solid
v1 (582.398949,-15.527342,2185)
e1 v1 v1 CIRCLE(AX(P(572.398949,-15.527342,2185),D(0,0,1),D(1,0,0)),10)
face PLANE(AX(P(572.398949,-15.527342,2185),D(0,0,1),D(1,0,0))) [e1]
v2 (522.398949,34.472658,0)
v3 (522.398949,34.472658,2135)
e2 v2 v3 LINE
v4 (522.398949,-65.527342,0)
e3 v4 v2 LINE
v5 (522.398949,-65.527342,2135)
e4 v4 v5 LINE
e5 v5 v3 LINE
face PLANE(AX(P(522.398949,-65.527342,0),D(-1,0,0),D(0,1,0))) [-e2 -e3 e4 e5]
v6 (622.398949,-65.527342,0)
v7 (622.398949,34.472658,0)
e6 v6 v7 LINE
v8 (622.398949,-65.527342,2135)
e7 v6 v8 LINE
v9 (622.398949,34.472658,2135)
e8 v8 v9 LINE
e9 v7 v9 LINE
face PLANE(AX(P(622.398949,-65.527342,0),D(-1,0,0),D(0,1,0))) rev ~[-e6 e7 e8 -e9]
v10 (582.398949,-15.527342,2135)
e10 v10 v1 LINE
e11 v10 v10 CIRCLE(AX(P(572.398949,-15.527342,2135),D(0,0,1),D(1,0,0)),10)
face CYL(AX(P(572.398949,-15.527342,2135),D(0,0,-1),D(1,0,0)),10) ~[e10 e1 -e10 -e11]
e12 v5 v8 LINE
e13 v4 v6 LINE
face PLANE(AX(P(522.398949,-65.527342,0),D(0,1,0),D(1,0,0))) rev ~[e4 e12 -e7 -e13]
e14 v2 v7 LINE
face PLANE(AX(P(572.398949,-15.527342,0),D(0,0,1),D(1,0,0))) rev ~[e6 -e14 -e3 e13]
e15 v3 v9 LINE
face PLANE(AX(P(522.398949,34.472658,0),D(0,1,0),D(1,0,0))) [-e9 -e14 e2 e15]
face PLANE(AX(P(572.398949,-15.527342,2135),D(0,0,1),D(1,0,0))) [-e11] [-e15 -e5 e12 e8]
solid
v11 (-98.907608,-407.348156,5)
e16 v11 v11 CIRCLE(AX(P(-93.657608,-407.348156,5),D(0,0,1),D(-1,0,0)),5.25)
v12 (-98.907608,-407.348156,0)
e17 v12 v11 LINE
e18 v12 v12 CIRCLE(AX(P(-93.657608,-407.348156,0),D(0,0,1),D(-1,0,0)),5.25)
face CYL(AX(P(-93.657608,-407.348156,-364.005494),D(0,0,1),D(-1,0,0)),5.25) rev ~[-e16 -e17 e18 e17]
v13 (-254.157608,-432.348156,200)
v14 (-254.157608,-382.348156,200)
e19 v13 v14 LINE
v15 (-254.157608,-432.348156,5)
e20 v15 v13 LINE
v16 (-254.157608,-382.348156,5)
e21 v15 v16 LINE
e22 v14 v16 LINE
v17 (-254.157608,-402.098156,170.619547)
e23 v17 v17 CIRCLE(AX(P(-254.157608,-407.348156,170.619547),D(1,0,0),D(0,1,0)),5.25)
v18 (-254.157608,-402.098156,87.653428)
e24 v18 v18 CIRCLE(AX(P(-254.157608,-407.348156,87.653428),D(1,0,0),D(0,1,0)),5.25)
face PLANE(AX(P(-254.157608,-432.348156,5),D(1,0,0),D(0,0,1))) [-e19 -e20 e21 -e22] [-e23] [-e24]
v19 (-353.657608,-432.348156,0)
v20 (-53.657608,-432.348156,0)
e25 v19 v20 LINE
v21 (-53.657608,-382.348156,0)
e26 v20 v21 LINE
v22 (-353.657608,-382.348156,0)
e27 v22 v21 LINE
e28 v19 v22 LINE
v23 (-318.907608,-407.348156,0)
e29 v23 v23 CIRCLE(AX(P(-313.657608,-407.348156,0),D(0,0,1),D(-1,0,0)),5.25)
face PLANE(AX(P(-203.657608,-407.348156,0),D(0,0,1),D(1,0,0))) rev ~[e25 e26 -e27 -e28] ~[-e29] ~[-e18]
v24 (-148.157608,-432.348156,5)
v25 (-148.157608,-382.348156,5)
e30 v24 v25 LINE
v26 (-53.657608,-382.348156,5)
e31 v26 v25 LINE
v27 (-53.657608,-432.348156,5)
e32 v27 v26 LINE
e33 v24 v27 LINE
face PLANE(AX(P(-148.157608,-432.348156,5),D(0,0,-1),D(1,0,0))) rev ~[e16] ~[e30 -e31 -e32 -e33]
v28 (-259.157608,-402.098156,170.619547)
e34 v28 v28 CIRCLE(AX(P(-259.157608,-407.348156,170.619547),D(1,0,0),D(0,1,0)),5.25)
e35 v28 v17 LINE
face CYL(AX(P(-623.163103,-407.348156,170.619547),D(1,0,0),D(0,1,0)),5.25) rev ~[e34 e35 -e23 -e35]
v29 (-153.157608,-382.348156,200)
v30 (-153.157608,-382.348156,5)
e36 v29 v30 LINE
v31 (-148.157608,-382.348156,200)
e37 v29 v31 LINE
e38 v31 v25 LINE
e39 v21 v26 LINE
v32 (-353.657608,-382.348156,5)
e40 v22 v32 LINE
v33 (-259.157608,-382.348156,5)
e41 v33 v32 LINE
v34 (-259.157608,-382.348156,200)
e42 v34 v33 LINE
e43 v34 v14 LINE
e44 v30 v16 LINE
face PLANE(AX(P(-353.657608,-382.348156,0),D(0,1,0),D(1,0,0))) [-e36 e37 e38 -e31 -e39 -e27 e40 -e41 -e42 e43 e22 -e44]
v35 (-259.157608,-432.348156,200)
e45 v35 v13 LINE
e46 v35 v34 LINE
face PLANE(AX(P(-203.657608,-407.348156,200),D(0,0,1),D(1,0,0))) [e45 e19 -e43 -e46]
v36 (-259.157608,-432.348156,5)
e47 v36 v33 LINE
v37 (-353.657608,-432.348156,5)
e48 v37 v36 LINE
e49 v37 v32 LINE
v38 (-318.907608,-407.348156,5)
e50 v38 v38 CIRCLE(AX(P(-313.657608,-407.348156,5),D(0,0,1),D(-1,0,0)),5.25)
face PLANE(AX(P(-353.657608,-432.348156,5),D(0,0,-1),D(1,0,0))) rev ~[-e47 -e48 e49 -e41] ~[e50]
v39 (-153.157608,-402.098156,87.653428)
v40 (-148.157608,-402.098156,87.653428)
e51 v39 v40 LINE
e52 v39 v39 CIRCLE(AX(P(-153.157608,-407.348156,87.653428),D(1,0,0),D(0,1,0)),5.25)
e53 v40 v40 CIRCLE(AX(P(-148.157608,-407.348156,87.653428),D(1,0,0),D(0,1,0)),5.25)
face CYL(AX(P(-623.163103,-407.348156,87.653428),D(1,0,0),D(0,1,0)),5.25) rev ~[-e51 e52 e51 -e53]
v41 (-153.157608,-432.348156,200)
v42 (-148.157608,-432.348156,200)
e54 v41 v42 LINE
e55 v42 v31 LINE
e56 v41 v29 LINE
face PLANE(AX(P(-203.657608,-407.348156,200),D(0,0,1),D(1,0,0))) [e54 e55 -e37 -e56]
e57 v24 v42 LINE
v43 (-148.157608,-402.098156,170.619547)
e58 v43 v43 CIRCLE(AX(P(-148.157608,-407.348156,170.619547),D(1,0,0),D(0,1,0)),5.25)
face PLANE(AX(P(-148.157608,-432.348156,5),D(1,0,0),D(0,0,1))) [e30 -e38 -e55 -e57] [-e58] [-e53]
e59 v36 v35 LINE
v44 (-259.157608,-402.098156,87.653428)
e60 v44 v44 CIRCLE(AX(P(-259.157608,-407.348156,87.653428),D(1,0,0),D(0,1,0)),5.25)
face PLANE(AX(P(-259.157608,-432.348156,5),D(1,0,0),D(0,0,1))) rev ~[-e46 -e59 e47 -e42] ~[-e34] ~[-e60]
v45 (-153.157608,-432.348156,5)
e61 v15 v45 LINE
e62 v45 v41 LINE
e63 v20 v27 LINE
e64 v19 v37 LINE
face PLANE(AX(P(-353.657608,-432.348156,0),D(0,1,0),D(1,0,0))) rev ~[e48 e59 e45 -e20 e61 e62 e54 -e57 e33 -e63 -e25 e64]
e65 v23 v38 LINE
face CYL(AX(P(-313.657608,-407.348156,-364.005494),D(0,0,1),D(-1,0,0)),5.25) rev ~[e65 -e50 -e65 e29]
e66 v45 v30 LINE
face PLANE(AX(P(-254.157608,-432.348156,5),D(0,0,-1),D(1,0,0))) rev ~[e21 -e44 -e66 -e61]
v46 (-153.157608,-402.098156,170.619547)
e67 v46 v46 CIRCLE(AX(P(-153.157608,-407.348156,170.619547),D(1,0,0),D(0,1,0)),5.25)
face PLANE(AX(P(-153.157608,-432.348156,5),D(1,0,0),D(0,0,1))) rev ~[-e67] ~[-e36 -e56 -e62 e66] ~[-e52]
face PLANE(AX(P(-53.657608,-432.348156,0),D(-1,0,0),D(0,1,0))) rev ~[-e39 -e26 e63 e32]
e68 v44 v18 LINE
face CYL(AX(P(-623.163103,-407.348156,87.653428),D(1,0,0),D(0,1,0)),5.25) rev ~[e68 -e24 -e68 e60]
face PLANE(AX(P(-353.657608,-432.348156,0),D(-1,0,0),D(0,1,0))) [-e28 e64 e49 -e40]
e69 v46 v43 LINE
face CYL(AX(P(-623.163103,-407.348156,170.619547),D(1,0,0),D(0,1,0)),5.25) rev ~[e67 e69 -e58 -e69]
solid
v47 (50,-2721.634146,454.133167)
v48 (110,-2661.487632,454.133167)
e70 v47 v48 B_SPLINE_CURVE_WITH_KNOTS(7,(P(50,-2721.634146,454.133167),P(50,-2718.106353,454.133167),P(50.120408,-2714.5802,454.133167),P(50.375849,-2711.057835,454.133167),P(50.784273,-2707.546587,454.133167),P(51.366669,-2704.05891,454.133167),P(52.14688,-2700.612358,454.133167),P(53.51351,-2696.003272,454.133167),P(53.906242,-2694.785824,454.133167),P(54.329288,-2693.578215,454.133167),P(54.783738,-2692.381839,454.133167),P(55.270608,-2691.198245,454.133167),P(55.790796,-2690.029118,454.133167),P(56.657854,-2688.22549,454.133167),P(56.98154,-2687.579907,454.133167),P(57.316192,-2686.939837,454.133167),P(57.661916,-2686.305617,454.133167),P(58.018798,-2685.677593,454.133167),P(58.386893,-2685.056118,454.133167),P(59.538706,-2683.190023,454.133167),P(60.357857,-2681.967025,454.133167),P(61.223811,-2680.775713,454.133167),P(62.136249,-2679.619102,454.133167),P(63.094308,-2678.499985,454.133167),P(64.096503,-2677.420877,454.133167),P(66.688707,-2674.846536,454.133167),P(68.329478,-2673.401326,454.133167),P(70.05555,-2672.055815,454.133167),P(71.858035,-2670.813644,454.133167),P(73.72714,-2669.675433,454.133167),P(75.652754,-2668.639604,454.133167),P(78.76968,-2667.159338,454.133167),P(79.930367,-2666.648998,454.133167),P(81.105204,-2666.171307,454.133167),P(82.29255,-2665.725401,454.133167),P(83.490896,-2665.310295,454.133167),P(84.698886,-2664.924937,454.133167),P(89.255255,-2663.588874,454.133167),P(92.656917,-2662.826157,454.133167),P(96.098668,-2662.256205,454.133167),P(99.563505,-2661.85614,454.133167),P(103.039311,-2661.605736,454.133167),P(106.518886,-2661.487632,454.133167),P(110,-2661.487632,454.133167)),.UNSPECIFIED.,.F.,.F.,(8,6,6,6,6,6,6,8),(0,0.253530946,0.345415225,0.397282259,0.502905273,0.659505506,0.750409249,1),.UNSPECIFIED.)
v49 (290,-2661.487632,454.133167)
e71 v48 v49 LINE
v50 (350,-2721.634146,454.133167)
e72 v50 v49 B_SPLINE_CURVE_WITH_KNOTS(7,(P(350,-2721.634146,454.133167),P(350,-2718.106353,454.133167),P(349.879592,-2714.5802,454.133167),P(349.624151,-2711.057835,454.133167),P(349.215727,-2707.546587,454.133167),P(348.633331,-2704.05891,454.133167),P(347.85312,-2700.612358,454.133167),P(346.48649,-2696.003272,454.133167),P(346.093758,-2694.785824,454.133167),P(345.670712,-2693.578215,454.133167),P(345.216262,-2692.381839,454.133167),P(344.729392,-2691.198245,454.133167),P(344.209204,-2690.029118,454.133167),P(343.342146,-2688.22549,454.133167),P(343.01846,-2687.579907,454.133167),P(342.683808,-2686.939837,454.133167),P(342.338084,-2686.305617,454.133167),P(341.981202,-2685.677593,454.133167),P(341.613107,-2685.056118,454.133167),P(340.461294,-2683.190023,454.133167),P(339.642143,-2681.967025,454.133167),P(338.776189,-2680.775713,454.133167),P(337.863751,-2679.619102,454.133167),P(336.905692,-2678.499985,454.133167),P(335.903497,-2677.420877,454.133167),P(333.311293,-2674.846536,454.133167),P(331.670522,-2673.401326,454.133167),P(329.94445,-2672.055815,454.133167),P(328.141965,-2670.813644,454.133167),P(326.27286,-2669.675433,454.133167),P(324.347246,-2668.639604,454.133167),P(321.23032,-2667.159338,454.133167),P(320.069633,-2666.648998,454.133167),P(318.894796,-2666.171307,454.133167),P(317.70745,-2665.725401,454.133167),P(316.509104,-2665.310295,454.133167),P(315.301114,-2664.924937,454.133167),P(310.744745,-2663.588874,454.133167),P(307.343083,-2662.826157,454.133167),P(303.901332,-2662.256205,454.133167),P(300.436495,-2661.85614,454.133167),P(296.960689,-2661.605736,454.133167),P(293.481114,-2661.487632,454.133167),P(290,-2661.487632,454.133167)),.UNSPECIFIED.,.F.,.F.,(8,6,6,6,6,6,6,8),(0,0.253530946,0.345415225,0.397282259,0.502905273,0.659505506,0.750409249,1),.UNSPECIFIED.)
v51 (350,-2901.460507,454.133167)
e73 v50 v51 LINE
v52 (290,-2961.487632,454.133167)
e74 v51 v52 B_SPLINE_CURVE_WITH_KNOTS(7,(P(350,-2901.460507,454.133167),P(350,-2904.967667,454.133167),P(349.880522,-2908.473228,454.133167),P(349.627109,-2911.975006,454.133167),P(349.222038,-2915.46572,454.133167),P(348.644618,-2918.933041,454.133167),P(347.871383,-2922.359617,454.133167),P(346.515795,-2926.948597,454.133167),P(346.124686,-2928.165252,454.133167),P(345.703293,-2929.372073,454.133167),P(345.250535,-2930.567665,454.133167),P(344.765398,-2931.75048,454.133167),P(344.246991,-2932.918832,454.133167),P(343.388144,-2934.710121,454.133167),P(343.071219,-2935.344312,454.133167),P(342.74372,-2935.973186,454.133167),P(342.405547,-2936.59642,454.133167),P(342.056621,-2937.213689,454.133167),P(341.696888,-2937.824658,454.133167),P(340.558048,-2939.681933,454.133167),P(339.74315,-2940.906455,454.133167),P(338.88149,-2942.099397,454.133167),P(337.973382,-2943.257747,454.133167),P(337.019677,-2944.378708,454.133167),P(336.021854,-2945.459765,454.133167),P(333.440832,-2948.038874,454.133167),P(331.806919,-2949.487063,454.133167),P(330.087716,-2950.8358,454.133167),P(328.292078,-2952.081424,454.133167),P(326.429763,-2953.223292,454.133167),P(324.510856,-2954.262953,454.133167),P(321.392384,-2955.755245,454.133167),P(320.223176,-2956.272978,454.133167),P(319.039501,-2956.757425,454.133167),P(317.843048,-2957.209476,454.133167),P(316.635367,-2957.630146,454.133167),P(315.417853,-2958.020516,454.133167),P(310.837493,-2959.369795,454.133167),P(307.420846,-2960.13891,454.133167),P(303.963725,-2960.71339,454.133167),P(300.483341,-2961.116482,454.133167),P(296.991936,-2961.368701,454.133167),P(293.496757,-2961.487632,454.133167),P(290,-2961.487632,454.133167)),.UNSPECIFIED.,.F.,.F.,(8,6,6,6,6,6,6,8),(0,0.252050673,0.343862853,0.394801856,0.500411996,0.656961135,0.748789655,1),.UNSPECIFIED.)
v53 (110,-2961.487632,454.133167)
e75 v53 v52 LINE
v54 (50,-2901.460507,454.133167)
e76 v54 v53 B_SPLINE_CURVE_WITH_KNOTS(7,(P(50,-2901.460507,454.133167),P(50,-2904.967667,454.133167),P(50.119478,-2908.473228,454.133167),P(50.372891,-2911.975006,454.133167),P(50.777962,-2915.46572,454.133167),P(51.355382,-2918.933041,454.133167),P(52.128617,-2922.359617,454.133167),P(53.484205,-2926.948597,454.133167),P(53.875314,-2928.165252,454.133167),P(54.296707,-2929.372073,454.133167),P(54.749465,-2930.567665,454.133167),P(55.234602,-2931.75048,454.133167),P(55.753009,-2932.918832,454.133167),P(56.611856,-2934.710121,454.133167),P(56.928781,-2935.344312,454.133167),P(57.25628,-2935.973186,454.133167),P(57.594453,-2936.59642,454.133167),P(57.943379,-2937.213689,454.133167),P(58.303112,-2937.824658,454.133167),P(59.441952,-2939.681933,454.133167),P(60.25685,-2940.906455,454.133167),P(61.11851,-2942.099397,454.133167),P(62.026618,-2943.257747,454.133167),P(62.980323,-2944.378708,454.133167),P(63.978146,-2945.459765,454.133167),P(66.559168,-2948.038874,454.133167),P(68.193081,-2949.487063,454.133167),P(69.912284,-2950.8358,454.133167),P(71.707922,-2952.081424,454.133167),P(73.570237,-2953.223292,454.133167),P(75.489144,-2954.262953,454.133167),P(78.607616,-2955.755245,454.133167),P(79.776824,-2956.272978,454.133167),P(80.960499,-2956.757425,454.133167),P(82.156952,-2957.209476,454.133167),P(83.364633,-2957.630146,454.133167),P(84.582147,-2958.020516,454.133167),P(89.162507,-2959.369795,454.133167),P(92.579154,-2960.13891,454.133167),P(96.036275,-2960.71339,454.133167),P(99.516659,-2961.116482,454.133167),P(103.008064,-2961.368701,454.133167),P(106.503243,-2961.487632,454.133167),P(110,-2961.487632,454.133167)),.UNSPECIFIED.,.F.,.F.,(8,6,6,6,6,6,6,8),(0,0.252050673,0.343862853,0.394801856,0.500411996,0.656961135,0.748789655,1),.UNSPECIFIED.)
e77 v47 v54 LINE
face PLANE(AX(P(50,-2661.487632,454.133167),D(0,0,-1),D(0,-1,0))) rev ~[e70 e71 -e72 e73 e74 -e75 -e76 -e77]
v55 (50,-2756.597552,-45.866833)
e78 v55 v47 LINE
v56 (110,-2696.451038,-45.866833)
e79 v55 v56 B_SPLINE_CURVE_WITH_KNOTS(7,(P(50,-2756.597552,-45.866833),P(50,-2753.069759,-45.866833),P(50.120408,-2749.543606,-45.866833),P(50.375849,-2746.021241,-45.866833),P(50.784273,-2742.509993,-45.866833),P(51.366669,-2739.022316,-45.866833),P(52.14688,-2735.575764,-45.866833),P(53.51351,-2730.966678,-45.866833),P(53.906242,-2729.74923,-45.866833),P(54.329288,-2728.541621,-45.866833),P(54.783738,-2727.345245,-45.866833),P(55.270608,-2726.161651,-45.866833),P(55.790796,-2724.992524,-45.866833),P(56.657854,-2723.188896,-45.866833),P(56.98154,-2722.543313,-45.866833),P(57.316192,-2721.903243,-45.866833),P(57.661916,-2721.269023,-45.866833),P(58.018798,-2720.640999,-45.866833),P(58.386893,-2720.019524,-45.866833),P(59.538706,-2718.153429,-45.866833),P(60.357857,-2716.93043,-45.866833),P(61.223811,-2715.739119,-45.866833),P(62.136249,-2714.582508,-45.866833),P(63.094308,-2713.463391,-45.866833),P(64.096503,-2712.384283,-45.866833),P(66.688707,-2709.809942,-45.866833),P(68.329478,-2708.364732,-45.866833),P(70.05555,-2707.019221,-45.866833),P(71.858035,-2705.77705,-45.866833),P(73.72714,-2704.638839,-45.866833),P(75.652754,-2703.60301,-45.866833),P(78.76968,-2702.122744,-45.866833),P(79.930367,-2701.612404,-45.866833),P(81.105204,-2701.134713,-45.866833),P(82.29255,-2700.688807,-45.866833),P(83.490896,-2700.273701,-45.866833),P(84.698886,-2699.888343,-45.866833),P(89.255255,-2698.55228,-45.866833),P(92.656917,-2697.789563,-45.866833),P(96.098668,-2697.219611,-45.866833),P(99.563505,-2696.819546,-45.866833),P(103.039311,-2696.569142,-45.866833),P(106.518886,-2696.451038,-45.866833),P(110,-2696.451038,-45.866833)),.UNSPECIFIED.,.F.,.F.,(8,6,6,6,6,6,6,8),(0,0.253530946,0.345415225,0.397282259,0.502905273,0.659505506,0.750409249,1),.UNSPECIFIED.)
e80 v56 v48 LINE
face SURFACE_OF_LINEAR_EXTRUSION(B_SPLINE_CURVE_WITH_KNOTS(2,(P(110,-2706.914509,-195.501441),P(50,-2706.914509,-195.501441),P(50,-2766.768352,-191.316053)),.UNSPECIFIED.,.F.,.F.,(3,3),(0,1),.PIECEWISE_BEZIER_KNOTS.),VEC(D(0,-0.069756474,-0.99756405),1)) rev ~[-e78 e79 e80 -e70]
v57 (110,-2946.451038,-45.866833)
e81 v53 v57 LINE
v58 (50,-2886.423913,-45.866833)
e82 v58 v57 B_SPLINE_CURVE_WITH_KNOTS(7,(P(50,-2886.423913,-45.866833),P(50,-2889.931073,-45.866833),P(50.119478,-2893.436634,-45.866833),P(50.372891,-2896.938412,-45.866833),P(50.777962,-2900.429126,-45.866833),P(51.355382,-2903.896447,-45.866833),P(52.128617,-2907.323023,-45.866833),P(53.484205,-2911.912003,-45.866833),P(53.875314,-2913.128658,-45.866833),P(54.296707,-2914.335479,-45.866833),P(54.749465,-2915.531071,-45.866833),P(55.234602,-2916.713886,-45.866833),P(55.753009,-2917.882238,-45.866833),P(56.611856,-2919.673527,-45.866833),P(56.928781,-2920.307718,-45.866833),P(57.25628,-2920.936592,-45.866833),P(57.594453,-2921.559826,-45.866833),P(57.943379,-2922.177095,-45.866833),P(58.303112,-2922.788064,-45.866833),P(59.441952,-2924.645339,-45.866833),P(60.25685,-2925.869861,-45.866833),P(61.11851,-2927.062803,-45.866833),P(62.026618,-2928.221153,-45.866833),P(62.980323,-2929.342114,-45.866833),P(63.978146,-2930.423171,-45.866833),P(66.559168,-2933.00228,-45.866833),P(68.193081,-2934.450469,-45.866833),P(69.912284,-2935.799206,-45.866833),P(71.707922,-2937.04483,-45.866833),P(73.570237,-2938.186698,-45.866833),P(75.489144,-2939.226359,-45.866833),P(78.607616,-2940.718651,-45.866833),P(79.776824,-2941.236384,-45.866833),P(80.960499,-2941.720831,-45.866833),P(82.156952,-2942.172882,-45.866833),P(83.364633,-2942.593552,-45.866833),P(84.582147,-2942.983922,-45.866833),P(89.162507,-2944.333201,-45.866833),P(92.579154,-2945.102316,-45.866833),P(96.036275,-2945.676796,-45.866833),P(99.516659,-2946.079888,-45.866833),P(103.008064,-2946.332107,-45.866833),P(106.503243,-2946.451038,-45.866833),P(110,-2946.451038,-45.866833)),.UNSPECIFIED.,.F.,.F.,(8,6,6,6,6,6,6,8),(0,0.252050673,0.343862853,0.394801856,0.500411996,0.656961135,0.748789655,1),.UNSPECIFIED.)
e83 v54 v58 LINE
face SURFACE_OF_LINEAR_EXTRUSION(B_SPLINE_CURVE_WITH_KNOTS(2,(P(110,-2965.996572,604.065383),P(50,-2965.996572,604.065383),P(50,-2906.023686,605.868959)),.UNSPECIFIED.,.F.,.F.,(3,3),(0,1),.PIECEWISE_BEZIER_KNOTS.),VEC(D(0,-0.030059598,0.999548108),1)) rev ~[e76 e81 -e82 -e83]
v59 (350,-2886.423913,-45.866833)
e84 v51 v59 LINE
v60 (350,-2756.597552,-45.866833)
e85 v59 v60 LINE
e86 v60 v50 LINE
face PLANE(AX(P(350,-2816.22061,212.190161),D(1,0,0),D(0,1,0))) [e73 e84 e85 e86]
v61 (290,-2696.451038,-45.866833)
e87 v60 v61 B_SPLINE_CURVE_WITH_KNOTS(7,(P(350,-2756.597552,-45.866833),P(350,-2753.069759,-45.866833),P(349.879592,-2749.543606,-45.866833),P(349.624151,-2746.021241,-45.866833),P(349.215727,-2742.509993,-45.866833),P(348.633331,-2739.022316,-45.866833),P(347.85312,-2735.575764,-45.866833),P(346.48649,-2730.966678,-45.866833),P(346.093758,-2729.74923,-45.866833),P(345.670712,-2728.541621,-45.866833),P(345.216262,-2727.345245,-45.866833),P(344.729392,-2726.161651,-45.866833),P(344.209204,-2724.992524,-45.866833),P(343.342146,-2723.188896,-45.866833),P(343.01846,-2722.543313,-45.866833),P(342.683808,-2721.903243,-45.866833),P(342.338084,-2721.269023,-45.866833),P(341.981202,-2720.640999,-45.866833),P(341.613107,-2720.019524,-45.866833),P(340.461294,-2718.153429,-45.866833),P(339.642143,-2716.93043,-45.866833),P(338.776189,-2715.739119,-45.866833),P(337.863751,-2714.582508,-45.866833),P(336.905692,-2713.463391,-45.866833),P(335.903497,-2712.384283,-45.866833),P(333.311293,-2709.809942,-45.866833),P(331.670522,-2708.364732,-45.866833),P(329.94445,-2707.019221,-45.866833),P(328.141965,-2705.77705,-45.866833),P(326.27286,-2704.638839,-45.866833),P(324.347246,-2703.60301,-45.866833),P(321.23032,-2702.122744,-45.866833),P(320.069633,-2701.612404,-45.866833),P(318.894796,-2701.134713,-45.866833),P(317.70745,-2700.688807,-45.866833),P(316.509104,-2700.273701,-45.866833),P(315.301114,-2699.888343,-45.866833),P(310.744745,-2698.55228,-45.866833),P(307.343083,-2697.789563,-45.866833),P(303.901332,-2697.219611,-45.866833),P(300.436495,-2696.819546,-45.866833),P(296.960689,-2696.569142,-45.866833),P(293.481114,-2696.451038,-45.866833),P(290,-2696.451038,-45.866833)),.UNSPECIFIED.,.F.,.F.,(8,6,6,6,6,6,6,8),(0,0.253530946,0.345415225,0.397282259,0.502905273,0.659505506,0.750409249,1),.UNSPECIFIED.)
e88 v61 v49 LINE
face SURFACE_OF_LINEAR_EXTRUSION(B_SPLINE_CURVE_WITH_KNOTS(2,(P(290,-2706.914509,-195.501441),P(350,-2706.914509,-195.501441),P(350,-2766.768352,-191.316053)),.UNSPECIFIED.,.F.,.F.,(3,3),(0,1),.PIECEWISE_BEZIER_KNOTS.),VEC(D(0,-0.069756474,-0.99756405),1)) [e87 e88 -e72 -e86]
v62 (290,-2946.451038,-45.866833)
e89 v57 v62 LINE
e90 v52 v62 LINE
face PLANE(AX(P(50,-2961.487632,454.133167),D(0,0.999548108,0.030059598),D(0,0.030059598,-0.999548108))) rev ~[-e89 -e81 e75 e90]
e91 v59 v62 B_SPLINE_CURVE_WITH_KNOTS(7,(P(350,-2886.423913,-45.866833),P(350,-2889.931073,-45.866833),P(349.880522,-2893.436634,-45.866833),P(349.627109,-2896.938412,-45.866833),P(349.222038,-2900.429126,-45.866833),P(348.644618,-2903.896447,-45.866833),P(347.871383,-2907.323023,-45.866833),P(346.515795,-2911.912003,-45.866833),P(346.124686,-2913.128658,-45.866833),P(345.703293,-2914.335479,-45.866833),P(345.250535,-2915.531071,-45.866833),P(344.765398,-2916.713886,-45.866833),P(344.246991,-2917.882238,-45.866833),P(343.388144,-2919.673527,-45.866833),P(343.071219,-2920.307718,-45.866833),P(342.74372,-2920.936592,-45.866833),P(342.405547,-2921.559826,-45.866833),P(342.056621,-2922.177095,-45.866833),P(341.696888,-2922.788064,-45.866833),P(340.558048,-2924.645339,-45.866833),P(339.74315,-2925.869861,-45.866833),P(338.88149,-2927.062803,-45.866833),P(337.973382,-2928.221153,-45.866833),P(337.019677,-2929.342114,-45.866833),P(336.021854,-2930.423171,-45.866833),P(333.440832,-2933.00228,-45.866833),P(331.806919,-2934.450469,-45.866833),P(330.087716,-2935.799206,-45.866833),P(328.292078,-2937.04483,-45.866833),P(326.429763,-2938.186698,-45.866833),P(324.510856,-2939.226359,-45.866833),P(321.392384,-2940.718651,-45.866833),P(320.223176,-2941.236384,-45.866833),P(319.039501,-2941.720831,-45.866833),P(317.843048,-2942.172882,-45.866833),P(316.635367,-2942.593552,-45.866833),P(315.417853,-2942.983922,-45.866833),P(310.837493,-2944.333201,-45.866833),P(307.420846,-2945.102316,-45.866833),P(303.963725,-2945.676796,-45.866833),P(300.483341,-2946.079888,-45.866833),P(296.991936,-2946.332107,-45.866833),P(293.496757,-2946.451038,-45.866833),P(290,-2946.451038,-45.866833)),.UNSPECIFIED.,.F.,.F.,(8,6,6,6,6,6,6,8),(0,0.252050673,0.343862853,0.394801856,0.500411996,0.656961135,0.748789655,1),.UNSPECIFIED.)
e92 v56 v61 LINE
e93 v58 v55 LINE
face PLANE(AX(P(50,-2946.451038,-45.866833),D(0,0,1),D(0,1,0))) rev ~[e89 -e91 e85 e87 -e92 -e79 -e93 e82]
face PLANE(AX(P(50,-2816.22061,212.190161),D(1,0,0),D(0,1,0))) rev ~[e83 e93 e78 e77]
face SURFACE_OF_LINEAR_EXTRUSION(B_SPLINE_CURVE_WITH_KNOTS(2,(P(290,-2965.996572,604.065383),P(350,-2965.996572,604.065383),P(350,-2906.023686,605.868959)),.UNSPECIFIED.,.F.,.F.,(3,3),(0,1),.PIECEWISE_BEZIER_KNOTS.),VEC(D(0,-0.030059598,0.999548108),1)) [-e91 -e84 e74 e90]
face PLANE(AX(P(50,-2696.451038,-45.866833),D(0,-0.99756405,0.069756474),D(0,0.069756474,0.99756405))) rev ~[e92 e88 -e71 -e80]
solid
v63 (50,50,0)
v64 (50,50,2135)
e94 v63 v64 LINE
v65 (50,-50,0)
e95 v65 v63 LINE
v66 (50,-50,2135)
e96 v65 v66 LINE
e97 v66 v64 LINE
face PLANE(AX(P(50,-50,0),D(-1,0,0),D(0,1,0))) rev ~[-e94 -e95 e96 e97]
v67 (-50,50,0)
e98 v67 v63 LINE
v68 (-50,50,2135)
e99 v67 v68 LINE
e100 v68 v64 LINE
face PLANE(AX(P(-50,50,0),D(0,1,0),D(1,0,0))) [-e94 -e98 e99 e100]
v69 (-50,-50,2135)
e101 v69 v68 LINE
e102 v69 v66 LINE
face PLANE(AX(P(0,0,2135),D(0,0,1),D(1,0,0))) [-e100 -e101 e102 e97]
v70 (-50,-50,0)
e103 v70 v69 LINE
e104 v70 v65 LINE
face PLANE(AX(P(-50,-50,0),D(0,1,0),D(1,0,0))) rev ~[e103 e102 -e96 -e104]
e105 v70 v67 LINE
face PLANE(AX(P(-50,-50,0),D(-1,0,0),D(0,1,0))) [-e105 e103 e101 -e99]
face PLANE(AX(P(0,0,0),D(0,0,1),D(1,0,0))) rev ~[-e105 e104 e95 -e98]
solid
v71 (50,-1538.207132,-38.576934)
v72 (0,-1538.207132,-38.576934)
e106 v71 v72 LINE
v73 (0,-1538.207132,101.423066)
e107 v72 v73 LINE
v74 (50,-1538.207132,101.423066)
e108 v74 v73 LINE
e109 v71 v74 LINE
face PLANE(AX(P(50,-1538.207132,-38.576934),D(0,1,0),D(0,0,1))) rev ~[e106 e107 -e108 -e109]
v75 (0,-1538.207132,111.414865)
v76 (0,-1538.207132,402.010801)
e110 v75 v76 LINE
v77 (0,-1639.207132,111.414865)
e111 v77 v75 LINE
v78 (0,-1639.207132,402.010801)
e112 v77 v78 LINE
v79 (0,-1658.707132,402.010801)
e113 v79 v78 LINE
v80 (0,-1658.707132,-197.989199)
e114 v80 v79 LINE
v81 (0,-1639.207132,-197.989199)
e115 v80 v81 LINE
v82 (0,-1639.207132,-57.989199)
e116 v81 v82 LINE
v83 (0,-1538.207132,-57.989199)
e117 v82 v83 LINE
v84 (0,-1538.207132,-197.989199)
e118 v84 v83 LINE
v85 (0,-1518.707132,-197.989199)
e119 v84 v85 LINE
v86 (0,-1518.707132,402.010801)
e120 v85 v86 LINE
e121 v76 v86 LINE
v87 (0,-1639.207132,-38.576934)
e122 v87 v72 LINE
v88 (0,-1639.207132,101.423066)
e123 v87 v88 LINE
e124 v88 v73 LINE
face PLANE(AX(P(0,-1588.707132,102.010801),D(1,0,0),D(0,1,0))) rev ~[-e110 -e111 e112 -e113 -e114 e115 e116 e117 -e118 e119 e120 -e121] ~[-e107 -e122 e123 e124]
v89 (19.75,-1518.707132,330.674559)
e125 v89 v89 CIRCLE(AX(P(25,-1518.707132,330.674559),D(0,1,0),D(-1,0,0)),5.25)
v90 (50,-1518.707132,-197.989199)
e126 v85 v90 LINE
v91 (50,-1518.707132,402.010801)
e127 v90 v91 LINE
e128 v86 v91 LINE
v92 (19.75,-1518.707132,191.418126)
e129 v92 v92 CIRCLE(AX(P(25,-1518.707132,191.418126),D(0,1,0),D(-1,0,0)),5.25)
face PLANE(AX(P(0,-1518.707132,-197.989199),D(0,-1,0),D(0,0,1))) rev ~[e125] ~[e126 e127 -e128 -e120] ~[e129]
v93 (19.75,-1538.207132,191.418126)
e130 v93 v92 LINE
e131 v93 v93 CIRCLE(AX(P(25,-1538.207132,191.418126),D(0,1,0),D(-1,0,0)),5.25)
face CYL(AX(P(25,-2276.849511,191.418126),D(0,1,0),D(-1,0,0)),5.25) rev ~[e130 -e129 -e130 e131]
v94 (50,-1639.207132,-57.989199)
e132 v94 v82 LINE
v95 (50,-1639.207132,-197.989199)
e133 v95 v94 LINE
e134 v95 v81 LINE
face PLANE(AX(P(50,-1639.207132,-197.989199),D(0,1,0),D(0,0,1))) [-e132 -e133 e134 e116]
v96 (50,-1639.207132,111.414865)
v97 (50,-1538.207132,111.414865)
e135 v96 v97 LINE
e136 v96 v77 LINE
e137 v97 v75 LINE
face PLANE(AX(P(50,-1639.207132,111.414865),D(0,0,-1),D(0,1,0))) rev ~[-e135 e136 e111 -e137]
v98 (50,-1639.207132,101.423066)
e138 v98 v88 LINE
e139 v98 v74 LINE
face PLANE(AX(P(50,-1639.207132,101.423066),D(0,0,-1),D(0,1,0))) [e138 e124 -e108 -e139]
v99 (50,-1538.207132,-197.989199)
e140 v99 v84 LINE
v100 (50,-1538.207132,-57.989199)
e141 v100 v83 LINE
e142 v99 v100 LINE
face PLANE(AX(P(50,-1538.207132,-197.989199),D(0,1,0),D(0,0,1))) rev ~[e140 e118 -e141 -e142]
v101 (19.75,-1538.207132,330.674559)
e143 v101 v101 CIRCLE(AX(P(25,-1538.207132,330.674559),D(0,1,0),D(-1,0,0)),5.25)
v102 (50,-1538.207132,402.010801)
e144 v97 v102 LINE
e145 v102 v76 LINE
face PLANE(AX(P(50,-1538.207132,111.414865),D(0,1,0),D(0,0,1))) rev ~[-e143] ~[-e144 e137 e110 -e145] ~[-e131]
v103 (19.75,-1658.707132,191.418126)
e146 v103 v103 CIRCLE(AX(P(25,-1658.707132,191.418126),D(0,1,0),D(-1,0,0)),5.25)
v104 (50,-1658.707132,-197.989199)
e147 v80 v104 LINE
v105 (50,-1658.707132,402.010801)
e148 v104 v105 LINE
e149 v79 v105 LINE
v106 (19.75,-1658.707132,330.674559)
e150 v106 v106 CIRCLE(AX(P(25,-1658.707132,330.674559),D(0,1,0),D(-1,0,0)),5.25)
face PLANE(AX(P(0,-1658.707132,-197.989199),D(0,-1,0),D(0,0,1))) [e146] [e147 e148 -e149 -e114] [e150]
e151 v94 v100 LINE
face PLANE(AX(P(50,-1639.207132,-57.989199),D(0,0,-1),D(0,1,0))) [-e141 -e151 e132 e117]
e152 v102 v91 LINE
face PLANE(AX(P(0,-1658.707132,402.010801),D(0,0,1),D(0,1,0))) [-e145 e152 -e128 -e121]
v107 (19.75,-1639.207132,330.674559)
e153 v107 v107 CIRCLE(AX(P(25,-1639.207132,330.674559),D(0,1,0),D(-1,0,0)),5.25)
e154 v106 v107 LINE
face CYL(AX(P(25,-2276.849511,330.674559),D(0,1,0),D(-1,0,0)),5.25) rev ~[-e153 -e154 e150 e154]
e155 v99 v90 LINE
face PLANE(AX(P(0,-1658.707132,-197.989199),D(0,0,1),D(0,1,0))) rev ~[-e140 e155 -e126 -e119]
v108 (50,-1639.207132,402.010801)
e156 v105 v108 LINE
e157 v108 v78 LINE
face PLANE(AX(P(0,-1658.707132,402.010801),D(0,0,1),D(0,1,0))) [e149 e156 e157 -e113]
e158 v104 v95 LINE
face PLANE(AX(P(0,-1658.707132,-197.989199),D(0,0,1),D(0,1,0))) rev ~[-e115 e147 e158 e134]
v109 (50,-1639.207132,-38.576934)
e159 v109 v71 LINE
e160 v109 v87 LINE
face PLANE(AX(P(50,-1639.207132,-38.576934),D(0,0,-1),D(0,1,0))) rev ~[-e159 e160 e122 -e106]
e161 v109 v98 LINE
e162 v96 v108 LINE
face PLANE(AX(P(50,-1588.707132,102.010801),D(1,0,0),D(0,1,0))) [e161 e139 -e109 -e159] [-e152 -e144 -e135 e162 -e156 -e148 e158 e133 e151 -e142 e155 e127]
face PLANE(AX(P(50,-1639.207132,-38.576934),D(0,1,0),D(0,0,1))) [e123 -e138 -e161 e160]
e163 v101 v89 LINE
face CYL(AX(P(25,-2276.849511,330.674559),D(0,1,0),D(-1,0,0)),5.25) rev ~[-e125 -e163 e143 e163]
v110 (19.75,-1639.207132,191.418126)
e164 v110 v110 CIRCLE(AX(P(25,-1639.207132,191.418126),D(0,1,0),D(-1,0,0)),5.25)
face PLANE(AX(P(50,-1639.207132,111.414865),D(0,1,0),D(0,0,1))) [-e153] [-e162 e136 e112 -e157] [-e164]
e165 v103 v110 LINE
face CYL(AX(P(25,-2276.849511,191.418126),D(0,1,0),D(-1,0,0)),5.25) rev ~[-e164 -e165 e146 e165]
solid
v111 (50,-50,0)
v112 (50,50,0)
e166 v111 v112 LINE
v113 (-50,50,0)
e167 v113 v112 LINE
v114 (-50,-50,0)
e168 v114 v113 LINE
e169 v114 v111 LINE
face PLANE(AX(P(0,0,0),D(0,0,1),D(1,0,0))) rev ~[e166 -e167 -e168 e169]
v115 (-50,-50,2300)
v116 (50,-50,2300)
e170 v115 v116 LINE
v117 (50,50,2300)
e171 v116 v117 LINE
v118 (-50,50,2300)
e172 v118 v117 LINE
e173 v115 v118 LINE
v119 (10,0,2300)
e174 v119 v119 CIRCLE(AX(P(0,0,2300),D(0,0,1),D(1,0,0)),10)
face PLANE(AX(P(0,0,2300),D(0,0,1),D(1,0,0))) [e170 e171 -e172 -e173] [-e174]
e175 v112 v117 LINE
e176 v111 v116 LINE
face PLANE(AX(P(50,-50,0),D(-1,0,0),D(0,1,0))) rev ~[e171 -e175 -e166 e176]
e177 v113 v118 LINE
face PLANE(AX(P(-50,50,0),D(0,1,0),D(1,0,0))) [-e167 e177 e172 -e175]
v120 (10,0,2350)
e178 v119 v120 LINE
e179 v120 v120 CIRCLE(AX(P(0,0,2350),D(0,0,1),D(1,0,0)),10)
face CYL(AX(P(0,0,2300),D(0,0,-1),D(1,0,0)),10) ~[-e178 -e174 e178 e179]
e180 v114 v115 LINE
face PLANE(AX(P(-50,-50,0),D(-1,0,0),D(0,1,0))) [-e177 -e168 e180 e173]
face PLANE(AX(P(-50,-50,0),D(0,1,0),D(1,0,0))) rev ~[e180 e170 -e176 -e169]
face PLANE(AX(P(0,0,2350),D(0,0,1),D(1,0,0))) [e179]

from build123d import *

# Parameters (mm, degrees)
F0_W         = 100
F0_H         = 100
F1_DEPTH     = 2300
F2_DEPTH     = 2135
F3_R         = 10
F4_DEPTH     = 50
F5_R         = 10
F6_DEPTH     = 50
F7_W         = 140
F7_H         = 600
F8_DEPTH     = 50
F9_W         = 101
F9_H         = 290.5959367752
F9_H_2       = 140
F10_DEPTH    = 100.001
F11_DEPTH    = 300
F12_T1_DEPTH = 800.2260480622
F12_T3_DEPTH = 801.2209490406
F14_W        = 300
F14_H        = 50
F15_DEPTH    = 200
F16_W        = 94.5
F16_H        = 195
F16_W_2      = 101
F17_DEPTH    = 482.3491559753
F19_D        = 10.5
F20_D        = 10.5
F21_D        = 10.5


# Not quite as in the source:
# - a fillet or chamfer that OpenCascade refuses, or shapes differently, is made with other operations: its cross-section is extruded or revolved along the edge and cut away or added


with BuildPart() as f1:
    # F0 (on Top) → F1 (new body)
    with BuildSketch(Plane.XY):
        Rectangle(F0_W, F0_H)
    extrude(amount=F1_DEPTH)

    # F3 (on face) → F4 (join)
    with BuildSketch(Plane.XY.offset(2300)):
        Circle(F3_R)
    extrude(amount=F4_DEPTH)


with BuildPart() as f2:
    # F0 (on Top) → F2 (new body)
    with BuildSketch(Plane.XY):
        Rectangle(F0_W, F0_H)
    extrude(amount=F2_DEPTH)


with BuildPart() as f2b:
    # F0 (on Top) → F2, piece 2 (new body)
    with BuildSketch(Plane.XY):
        with Locations((572.3989486694, -15.5273422599)):
            Rectangle(F0_W, F0_H)
    extrude(amount=F2_DEPTH)

    # F5 (on face) → F6 (join)
    with BuildSketch(Plane.XY.offset(2135)):
        with Locations((572.3989486694, -15.5273422599)):
            Circle(F5_R)
    extrude(amount=F6_DEPTH)


with BuildPart() as f8:
    # F7 (on Right) → F8 (new body)
    with BuildSketch(Plane.YZ):
        with Locations((-1588.707132116, 102.0108014345)):
            Rectangle(F7_W, F7_H)
    extrude(amount=F8_DEPTH)

    # F9 (on face) → F10 (cut, through all)
    with BuildSketch(Plane.YZ.offset(50)):
        with Locations((-1588.707132116, 256.7128330469)):
            Rectangle(F9_W, F9_H)
        with Locations((-1588.707132116, 31.4230661094)):
            Rectangle(F9_W, F9_H_2)
        with Locations((-1588.707132116, -127.9891985655)):
            Rectangle(F9_W, F9_H_2)
    extrude(amount=-F10_DEPTH, mode=Mode.SUBTRACT)

    # F19 (through all)
    with Locations(Plane.XZ.offset(1658.707132116)):
        with Locations((25, 330.6745588779), (25, 191.4181262255)):
            Hole(F19_D / 2)


with BuildPart() as f11:
    # F9 (on face) → F11 (new body)
    with BuildSketch(Plane.YZ.offset(50)):
        Polygon((-2661.4876322974, 454.1331665205), (-2961.4876322974, 454.1331665205), (-2946.4510382692, -45.8668334795), (-2696.4510382692, -45.8668334795), align=None)
    extrude(amount=F11_DEPTH)

    # F12: fillet of radius 60 on 4 edges, made by hand

    # F12_s2 → F12_t1 (cut)
    with BuildSketch(Plane(origin=(0, -20.8297708127, 692.6359378174), x_dir=(1, 0, 0), z_dir=(0, 0.0300595982, -0.9995481082))):
        with BuildLine():
            add(Edge.make_bspline(
                [(290, 2946.4982997158), (350, 2946.4982997158), (350, 2886.4982997158)],
                knots=[0, 0, 0, 1, 1, 1], degree=2, weights=[1, 1, 1]))
            Line((350, 2886.4982997158), (350, 2946.4982997158))
            Line((350, 2946.4982997158), (290, 2946.4982997158))
        make_face()
        with BuildLine():
            add(Edge.make_bspline(
                [(110, 2946.4982997158), (50, 2946.4982997158), (50, 2886.4982997158)],
                knots=[0, 0, 0, 1, 1, 1], degree=2, weights=[1, 1, 1]))
            Line((50, 2886.4982997158), (50, 2946.4982997158))
            Line((50, 2946.4982997158), (110, 2946.4982997158))
        make_face()
    extrude(amount=F12_T1_DEPTH, mode=Mode.SUBTRACT)

    # F12_s4 → F12_t3 (cut)
    with BuildSketch(Plane(origin=(0, -26.776023858, -382.9149808747), x_dir=(1, 0, 0), z_dir=(0, 0.0697564737, 0.9975640503))):
        with BuildLine():
            add(Edge.make_bspline(
                [(110, -2686.6831104978), (50, -2686.6831104978), (50, -2746.6831104978)],
                knots=[0, 0, 0, 1, 1, 1], degree=2, weights=[1, 1, 1]))
            Line((50, -2746.6831104978), (50, -2686.6831104978))
            Line((50, -2686.6831104978), (110, -2686.6831104978))
        make_face()
        with BuildLine():
            add(Edge.make_bspline(
                [(290, -2686.6831104978), (350, -2686.6831104978), (350, -2746.6831104978)],
                knots=[0, 0, 0, 1, 1, 1], degree=2, weights=[1, 1, 1]))
            Line((350, -2746.6831104978), (350, -2686.6831104978))
            Line((350, -2686.6831104978), (290, -2686.6831104978))
        make_face()
    extrude(amount=F12_T3_DEPTH, mode=Mode.SUBTRACT)


with BuildPart() as f15:
    # F14 (on Top) → F15 (new body)
    with BuildSketch(Plane.XY):
        with Locations((-203.6576080547, -407.3481559753)):
            Rectangle(F14_W, F14_H)
    extrude(amount=F15_DEPTH)

    # F16 (on face) → F17 (cut, through all)
    with BuildSketch(Plane.XZ.offset(432.3481559753)):
        with Locations((-306.4076080547, 102.5)):
            Rectangle(F16_W, F16_H)
        with Locations((-203.6576080547, 102.5)):
            Rectangle(F16_W_2, F16_H)
        with Locations((-100.9076080547, 102.5)):
            Rectangle(F16_W, F16_H)
    extrude(amount=-F17_DEPTH, mode=Mode.SUBTRACT)

    # F20 (through all)
    with Locations(Plane(origin=(0, 0, 0), x_dir=(1, 0, 0), z_dir=(0, 0, -1))):
        with Locations((-313.6576080547, 407.3481559753), (-93.6576080547, 407.3481559753)):
            Hole(F20_D / 2)

    # F21 (through all)
    with Locations(Plane(origin=(-259.1576080547, 0, 0), x_dir=(0, -1, 0), z_dir=(-1, 0, 0))):
        with Locations((407.3481559753, 170.6195473671), (407.3481559753, 87.6534283161)):
            Hole(F21_D / 2)


solid = Compound([f1.part, f2.part, f2b.part, f8.part, f11.part, f15.part])
